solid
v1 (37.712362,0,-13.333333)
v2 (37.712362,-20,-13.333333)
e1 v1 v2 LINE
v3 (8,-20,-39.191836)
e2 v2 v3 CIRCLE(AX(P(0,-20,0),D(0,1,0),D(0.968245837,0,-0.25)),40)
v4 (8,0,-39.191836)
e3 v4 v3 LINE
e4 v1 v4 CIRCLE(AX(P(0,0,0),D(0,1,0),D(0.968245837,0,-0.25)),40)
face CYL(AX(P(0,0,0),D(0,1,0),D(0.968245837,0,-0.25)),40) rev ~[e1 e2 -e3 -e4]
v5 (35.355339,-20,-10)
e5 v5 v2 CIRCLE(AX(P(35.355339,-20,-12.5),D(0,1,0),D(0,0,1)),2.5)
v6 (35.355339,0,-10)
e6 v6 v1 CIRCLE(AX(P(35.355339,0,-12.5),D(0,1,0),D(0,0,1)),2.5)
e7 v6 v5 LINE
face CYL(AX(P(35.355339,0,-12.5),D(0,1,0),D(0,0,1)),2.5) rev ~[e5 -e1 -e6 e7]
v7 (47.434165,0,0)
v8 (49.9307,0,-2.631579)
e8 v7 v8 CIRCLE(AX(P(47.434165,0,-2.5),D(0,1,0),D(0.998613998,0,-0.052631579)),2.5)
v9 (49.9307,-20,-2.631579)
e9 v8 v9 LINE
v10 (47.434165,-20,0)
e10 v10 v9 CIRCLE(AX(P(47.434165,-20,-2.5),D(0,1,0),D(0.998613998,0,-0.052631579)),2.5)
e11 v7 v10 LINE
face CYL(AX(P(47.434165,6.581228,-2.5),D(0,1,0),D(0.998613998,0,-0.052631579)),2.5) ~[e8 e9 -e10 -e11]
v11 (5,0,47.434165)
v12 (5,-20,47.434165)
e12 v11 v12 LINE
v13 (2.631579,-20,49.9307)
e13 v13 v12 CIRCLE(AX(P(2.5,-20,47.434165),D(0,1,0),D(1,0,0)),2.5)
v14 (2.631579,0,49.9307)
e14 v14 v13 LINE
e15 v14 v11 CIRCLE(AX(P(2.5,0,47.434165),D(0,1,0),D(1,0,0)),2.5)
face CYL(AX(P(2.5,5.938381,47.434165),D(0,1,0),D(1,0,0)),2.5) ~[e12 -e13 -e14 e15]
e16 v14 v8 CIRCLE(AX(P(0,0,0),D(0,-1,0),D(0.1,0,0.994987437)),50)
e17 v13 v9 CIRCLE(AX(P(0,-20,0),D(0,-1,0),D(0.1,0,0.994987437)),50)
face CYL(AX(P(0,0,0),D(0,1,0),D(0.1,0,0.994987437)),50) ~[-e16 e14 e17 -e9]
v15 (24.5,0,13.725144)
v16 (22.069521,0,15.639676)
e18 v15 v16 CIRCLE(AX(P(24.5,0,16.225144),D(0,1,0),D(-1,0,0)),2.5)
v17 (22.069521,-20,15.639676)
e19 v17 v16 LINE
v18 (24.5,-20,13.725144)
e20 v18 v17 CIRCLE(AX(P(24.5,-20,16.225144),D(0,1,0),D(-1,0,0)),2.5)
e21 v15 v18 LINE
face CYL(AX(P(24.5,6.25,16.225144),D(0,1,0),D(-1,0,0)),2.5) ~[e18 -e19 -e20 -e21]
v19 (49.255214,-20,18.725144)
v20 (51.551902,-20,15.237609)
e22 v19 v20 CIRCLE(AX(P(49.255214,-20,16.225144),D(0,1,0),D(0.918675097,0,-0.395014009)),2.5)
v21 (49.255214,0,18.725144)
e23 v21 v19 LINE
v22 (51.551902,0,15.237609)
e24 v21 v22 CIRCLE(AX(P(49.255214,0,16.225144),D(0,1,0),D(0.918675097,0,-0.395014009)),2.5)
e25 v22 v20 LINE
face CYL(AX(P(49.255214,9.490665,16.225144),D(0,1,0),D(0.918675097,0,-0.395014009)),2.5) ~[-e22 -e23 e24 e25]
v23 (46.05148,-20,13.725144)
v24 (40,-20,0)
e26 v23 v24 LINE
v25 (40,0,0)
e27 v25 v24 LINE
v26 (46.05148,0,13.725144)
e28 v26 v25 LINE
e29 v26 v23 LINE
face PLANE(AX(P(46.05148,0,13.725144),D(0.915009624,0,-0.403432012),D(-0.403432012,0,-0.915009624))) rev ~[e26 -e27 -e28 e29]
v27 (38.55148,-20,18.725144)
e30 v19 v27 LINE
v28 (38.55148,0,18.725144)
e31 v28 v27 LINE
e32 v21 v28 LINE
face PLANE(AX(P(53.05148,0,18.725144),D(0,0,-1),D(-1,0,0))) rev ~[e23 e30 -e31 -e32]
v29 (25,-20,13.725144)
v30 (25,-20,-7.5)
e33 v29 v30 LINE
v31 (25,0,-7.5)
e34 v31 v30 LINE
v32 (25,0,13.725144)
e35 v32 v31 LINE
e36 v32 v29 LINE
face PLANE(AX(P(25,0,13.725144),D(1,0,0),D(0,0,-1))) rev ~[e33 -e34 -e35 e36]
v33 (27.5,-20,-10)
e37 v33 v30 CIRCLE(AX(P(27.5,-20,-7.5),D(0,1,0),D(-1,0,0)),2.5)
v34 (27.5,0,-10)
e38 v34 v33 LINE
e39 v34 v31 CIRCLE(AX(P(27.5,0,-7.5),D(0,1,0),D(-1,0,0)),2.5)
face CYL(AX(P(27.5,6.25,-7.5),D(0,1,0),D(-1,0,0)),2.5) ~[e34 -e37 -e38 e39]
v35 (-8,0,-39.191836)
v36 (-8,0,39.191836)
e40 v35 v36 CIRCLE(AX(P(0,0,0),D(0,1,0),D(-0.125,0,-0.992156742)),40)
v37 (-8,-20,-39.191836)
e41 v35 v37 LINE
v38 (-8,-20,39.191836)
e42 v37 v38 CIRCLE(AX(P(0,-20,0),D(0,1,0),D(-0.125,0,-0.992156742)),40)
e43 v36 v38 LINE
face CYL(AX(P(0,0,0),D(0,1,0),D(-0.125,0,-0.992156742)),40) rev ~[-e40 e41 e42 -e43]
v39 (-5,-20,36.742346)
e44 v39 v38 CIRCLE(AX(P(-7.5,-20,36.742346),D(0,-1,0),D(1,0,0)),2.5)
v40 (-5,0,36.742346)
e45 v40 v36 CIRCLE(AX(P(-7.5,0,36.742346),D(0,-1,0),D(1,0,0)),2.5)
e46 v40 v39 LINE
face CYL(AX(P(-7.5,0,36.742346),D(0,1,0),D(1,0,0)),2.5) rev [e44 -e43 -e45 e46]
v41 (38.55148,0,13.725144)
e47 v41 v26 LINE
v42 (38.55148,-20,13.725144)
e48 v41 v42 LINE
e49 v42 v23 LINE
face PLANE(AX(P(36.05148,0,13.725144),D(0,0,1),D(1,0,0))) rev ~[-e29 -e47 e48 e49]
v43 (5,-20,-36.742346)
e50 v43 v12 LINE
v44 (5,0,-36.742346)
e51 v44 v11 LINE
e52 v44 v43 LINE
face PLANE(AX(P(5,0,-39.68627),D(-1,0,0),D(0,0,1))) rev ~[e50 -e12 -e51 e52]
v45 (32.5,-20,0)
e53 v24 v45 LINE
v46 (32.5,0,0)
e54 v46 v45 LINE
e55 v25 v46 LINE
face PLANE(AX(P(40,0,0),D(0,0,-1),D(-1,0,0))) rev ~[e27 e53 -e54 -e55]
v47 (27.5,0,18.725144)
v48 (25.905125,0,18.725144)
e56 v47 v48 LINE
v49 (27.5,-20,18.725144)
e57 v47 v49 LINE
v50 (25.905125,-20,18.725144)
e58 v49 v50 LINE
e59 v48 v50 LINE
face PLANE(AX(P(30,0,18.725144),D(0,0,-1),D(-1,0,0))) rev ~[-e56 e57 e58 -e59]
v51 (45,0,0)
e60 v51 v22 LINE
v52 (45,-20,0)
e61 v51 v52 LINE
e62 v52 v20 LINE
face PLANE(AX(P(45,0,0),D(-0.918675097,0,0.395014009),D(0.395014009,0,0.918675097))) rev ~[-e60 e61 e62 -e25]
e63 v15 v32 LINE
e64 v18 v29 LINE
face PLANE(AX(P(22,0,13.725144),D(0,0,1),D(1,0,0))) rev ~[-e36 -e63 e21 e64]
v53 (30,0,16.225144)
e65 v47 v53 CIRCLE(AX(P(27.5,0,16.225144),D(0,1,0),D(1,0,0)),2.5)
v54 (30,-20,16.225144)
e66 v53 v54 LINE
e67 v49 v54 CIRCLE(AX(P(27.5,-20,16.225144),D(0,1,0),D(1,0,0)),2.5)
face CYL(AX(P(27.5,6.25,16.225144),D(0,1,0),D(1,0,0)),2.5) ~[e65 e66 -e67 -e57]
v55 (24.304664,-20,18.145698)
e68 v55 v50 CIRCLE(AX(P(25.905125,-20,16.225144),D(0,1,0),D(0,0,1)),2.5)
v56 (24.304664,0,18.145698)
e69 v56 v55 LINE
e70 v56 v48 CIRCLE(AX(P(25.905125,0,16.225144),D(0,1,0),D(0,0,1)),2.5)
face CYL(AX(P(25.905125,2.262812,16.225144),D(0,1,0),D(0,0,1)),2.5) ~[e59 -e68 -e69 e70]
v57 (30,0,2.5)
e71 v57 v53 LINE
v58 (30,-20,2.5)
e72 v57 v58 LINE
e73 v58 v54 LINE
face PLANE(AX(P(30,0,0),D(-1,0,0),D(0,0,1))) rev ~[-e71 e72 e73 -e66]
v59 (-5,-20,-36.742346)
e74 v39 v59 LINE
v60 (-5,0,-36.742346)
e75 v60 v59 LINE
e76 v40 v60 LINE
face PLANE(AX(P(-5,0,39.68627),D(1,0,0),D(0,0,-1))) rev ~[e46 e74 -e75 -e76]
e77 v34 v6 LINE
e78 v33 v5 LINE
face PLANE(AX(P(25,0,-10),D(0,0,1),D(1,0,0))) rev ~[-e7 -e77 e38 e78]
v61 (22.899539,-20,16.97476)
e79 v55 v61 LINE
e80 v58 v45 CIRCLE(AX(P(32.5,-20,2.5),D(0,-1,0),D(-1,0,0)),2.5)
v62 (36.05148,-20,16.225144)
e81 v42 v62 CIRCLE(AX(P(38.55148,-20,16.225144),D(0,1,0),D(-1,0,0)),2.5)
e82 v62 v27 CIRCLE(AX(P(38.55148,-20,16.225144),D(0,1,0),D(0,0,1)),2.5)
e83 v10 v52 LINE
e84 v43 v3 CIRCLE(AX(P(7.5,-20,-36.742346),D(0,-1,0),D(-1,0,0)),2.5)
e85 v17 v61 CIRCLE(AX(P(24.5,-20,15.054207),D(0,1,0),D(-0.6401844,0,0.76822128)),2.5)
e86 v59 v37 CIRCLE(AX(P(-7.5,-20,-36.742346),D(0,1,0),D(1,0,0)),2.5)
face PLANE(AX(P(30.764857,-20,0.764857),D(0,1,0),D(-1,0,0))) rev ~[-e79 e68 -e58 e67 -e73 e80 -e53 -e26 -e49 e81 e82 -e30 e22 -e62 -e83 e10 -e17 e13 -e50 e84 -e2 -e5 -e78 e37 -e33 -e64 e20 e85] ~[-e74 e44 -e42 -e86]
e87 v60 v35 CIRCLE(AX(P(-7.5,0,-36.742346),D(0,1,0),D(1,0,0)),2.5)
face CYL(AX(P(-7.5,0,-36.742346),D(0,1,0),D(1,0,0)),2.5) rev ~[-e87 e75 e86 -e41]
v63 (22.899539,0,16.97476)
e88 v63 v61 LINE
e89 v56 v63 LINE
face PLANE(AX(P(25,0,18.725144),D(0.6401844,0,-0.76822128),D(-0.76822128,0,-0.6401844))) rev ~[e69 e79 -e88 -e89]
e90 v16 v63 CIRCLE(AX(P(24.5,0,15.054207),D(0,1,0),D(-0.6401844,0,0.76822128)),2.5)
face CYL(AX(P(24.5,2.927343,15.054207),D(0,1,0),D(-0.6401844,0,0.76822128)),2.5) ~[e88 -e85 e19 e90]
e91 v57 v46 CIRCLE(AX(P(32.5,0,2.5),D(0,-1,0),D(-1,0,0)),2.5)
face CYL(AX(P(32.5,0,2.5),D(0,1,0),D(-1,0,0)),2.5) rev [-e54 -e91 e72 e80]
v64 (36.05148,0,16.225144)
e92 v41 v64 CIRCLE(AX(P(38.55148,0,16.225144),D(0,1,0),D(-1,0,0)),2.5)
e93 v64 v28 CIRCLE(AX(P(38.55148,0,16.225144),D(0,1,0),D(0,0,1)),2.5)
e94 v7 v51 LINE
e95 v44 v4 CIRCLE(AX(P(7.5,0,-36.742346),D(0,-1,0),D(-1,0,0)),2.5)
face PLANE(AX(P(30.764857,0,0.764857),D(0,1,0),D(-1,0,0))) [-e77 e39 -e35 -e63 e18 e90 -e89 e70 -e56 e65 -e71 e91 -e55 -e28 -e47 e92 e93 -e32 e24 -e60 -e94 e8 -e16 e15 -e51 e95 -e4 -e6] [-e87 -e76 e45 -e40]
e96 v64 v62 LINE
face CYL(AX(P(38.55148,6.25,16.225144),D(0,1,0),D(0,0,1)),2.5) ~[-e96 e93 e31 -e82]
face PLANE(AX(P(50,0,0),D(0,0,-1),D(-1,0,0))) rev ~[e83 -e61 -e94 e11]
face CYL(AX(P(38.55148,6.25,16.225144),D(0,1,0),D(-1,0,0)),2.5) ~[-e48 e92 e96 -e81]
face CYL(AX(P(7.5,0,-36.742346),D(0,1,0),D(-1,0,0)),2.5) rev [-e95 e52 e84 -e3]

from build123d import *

# Parameters (mm, degrees)
F1_DEPTH     = 20
F2_T1_DEPTH  = 20
F2_T3_DEPTH  = 31.8767610709
F2_T5_DEPTH  = 38.9813299321
F2_T7_DEPTH  = 32.5
F2_T9_DEPTH  = 33.1624563251
F2_T11_DEPTH = 24.5256241898
F2_T13_DEPTH = 25.8546868248


# Not quite as in the source:
# - a fillet or chamfer that OpenCascade refuses, or shapes differently, is made with other operations: its cross-section is extruded or revolved along the edge and cut away or added


with BuildPart() as f1:
    # F0 (on Front) → F1 (new body)
    with BuildSketch(Plane.XZ):
        with BuildLine():
            Line((5, -39.686269666), (5, 0))
            Line((5, 0), (5, 49.7493718553))
            ThreePointArc((5, 49.7493718553), (-37.0809924355, -33.5410196625), (50, 0))
            Line((50, 0), (45, 0))
            Line((45, 0), (53.0514801827, 18.7251443562))
            Line((53.0514801827, 18.7251443562), (36.0514801827, 18.7251443562))
            Line((36.0514801827, 18.7251443562), (36.0514801827, 13.7251443562))
            Line((36.0514801827, 13.7251443562), (46.0514801827, 13.7251443562))
            Line((46.0514801827, 13.7251443562), (40, 0))
            Line((40, 0), (30, 0))
            Line((30, 0), (30, 18.7251443562))
            Line((30, 18.7251443562), (25, 18.7251443562))
            Line((25, 18.7251443562), (22, 16.2251443562))
            Line((22, 16.2251443562), (22, 13.7251443562))
            Line((22, 13.7251443562), (25, 13.7251443562))
            Line((25, 13.7251443562), (25, 0))
            Line((25, 0), (25, -10))
            Line((25, -10), (38.7298334621, -10))
            ThreePointArc((38.7298334621, -10), (26.4271306677, -30.0267674696), (5, -39.686269666))
        make_face()
        with BuildLine():
            Line((-5, 39.686269666), (-5, 0))
            Line((-5, 0), (-5, -39.686269666))
            ThreePointArc((-5, -39.686269666), (-40, 0), (-5, 39.686269666))
        make_face(mode=Mode.SUBTRACT)
    extrude(amount=F1_DEPTH)

    # F2: fillet of radius 2.5 on 15 edges, made by hand

    # F2_s2 → F2_t1 (join)
    with BuildSketch(Plane.XZ):
        with BuildLine():
            ThreePointArc((30, 2.5), (30.732233047, 0.732233047), (32.5, 0))
            Line((32.5, 0), (30, 0))
            Line((30, 0), (30, 2.5))
        make_face()
        with BuildLine():
            ThreePointArc((35.3553390593, -10), (37.3965805116, -11.056624327), (37.7123616633, -13.3333333333))
            ThreePointArc((37.7123616633, -13.3333333333), (38.2574185835, -11.677753351), (38.7298334621, -10))
            Line((38.7298334621, -10), (35.3553390593, -10))
        make_face()
        with BuildLine():
            ThreePointArc((-5, 36.7423461417), (-5.9188611699, 38.6788378149), (-8, 39.1918358845))
            ThreePointArc((-8, 39.1918358845), (-6.5046995466, 39.4675674929), (-5, 39.686269666))
            Line((-5, 39.686269666), (-5, 36.7423461417))
        make_face()
        with BuildLine():
            ThreePointArc((-5, -36.7423461417), (-5.9188611699, -38.6788378149), (-8, -39.1918358845))
            ThreePointArc((-8, -39.1918358845), (-6.5046995466, -39.4675674929), (-5, -39.686269666))
            Line((-5, -39.686269666), (-5, -36.7423461417))
        make_face()
        with BuildLine():
            ThreePointArc((5, -36.7423461417), (5.9188611699, -38.6788378149), (8, -39.1918358845))
            ThreePointArc((8, -39.1918358845), (6.5046995466, -39.4675674929), (5, -39.686269666))
            Line((5, -39.686269666), (5, -36.7423461417))
        make_face()
    extrude(amount=F2_T1_DEPTH)

    # F2_s4 → F2_t3 (cut)
    with BuildSketch(Plane.XZ.offset(-5.9383805354)):
        with BuildLine():
            ThreePointArc((5, 47.4341649025), (4.3136906253, 49.1547829066), (2.6315789474, 49.9306998974))
            ThreePointArc((2.6315789474, 49.9306998974), (3.8168664205, 49.8541024463), (5, 49.7493718553))
            Line((5, 49.7493718553), (5, 47.4341649025))
        make_face()
    extrude(amount=F2_T3_DEPTH, mode=Mode.SUBTRACT)

    # F2_s6 → F2_t5 (cut)
    with BuildSketch(Plane.XZ.offset(-9.490664966)):
        with BuildLine():
            ThreePointArc((51.5519019376, 15.2376093346), (51.3431363158, 17.6001284372), (49.2552141963, 18.7251443562))
            Line((49.2552141963, 18.7251443562), (53.0514801827, 18.7251443562))
            Line((53.0514801827, 18.7251443562), (51.5519019376, 15.2376093346))
        make_face()
    extrude(amount=F2_T5_DEPTH, mode=Mode.SUBTRACT)

    # F2_s8 → F2_t7 (cut)
    with BuildSketch(Plane.XZ.offset(-6.25)):
        with BuildLine():
            ThreePointArc((30, 16.2251443562), (29.267766953, 17.9929113092), (27.5, 18.7251443562))
            Line((27.5, 18.7251443562), (30, 18.7251443562))
            Line((30, 18.7251443562), (30, 16.2251443562))
        make_face()
        with BuildLine():
            ThreePointArc((22, 16.2251443562), (22.732233047, 14.4573774032), (24.5, 13.7251443562))
            Line((24.5, 13.7251443562), (22, 13.7251443562))
            Line((22, 13.7251443562), (22, 16.2251443562))
        make_face()
        with BuildLine():
            ThreePointArc((25, -7.5), (25.732233047, -9.267766953), (27.5, -10))
            Line((27.5, -10), (25, -10))
            Line((25, -10), (25, -7.5))
        make_face()
        with BuildLine():
            ThreePointArc((38.5514801827, 18.7251443562), (36.7837132297, 17.9929113092), (36.0514801827, 16.2251443562))
            Line((36.0514801827, 16.2251443562), (36.0514801827, 18.7251443562))
            Line((36.0514801827, 18.7251443562), (38.5514801827, 18.7251443562))
        make_face()
        with BuildLine():
            ThreePointArc((36.0514801827, 16.2251443562), (36.7837132297, 14.4573774032), (38.5514801827, 13.7251443562))
            Line((38.5514801827, 13.7251443562), (36.0514801827, 13.7251443562))
            Line((36.0514801827, 13.7251443562), (36.0514801827, 16.2251443562))
        make_face()
    extrude(amount=F2_T7_DEPTH, mode=Mode.SUBTRACT)

    # F2_s10 → F2_t9 (cut)
    with BuildSketch(Plane.XZ.offset(-6.5812281626)):
        with BuildLine():
            ThreePointArc((49.9306998974, -2.6315789474), (49.2478555278, -0.779381996), (47.4341649025, 0))
            Line((47.4341649025, 0), (50, 0))
            ThreePointArc((50, 0), (49.9826719717, -1.3162456325), (49.9306998974, -2.6315789474))
        make_face()
    extrude(amount=F2_T9_DEPTH, mode=Mode.SUBTRACT)

    # F2_s12 → F2_t11 (cut)
    with BuildSketch(Plane.XZ.offset(-2.2628120949)):
        with BuildLine():
            ThreePointArc((25.905124838, 18.7251443562), (25.0540616786, 18.5758233004), (24.3046638388, 18.1456975552))
            Line((24.3046638388, 18.1456975552), (25, 18.7251443562))
            Line((25, 18.7251443562), (25.905124838, 18.7251443562))
        make_face()
    extrude(amount=F2_T11_DEPTH, mode=Mode.SUBTRACT)

    # F2_s14 → F2_t13 (cut)
    with BuildSketch(Plane.XZ.offset(-2.9273434124)):
        with BuildLine():
            ThreePointArc((22.8995390008, 16.9747601902), (22.2360264469, 16.1145954819), (22, 15.0542069912))
            Line((22, 15.0542069912), (22, 16.2251443562))
            Line((22, 16.2251443562), (22.8995390008, 16.9747601902))
        make_face()
    extrude(amount=F2_T13_DEPTH, mode=Mode.SUBTRACT)


solid = f1.part
